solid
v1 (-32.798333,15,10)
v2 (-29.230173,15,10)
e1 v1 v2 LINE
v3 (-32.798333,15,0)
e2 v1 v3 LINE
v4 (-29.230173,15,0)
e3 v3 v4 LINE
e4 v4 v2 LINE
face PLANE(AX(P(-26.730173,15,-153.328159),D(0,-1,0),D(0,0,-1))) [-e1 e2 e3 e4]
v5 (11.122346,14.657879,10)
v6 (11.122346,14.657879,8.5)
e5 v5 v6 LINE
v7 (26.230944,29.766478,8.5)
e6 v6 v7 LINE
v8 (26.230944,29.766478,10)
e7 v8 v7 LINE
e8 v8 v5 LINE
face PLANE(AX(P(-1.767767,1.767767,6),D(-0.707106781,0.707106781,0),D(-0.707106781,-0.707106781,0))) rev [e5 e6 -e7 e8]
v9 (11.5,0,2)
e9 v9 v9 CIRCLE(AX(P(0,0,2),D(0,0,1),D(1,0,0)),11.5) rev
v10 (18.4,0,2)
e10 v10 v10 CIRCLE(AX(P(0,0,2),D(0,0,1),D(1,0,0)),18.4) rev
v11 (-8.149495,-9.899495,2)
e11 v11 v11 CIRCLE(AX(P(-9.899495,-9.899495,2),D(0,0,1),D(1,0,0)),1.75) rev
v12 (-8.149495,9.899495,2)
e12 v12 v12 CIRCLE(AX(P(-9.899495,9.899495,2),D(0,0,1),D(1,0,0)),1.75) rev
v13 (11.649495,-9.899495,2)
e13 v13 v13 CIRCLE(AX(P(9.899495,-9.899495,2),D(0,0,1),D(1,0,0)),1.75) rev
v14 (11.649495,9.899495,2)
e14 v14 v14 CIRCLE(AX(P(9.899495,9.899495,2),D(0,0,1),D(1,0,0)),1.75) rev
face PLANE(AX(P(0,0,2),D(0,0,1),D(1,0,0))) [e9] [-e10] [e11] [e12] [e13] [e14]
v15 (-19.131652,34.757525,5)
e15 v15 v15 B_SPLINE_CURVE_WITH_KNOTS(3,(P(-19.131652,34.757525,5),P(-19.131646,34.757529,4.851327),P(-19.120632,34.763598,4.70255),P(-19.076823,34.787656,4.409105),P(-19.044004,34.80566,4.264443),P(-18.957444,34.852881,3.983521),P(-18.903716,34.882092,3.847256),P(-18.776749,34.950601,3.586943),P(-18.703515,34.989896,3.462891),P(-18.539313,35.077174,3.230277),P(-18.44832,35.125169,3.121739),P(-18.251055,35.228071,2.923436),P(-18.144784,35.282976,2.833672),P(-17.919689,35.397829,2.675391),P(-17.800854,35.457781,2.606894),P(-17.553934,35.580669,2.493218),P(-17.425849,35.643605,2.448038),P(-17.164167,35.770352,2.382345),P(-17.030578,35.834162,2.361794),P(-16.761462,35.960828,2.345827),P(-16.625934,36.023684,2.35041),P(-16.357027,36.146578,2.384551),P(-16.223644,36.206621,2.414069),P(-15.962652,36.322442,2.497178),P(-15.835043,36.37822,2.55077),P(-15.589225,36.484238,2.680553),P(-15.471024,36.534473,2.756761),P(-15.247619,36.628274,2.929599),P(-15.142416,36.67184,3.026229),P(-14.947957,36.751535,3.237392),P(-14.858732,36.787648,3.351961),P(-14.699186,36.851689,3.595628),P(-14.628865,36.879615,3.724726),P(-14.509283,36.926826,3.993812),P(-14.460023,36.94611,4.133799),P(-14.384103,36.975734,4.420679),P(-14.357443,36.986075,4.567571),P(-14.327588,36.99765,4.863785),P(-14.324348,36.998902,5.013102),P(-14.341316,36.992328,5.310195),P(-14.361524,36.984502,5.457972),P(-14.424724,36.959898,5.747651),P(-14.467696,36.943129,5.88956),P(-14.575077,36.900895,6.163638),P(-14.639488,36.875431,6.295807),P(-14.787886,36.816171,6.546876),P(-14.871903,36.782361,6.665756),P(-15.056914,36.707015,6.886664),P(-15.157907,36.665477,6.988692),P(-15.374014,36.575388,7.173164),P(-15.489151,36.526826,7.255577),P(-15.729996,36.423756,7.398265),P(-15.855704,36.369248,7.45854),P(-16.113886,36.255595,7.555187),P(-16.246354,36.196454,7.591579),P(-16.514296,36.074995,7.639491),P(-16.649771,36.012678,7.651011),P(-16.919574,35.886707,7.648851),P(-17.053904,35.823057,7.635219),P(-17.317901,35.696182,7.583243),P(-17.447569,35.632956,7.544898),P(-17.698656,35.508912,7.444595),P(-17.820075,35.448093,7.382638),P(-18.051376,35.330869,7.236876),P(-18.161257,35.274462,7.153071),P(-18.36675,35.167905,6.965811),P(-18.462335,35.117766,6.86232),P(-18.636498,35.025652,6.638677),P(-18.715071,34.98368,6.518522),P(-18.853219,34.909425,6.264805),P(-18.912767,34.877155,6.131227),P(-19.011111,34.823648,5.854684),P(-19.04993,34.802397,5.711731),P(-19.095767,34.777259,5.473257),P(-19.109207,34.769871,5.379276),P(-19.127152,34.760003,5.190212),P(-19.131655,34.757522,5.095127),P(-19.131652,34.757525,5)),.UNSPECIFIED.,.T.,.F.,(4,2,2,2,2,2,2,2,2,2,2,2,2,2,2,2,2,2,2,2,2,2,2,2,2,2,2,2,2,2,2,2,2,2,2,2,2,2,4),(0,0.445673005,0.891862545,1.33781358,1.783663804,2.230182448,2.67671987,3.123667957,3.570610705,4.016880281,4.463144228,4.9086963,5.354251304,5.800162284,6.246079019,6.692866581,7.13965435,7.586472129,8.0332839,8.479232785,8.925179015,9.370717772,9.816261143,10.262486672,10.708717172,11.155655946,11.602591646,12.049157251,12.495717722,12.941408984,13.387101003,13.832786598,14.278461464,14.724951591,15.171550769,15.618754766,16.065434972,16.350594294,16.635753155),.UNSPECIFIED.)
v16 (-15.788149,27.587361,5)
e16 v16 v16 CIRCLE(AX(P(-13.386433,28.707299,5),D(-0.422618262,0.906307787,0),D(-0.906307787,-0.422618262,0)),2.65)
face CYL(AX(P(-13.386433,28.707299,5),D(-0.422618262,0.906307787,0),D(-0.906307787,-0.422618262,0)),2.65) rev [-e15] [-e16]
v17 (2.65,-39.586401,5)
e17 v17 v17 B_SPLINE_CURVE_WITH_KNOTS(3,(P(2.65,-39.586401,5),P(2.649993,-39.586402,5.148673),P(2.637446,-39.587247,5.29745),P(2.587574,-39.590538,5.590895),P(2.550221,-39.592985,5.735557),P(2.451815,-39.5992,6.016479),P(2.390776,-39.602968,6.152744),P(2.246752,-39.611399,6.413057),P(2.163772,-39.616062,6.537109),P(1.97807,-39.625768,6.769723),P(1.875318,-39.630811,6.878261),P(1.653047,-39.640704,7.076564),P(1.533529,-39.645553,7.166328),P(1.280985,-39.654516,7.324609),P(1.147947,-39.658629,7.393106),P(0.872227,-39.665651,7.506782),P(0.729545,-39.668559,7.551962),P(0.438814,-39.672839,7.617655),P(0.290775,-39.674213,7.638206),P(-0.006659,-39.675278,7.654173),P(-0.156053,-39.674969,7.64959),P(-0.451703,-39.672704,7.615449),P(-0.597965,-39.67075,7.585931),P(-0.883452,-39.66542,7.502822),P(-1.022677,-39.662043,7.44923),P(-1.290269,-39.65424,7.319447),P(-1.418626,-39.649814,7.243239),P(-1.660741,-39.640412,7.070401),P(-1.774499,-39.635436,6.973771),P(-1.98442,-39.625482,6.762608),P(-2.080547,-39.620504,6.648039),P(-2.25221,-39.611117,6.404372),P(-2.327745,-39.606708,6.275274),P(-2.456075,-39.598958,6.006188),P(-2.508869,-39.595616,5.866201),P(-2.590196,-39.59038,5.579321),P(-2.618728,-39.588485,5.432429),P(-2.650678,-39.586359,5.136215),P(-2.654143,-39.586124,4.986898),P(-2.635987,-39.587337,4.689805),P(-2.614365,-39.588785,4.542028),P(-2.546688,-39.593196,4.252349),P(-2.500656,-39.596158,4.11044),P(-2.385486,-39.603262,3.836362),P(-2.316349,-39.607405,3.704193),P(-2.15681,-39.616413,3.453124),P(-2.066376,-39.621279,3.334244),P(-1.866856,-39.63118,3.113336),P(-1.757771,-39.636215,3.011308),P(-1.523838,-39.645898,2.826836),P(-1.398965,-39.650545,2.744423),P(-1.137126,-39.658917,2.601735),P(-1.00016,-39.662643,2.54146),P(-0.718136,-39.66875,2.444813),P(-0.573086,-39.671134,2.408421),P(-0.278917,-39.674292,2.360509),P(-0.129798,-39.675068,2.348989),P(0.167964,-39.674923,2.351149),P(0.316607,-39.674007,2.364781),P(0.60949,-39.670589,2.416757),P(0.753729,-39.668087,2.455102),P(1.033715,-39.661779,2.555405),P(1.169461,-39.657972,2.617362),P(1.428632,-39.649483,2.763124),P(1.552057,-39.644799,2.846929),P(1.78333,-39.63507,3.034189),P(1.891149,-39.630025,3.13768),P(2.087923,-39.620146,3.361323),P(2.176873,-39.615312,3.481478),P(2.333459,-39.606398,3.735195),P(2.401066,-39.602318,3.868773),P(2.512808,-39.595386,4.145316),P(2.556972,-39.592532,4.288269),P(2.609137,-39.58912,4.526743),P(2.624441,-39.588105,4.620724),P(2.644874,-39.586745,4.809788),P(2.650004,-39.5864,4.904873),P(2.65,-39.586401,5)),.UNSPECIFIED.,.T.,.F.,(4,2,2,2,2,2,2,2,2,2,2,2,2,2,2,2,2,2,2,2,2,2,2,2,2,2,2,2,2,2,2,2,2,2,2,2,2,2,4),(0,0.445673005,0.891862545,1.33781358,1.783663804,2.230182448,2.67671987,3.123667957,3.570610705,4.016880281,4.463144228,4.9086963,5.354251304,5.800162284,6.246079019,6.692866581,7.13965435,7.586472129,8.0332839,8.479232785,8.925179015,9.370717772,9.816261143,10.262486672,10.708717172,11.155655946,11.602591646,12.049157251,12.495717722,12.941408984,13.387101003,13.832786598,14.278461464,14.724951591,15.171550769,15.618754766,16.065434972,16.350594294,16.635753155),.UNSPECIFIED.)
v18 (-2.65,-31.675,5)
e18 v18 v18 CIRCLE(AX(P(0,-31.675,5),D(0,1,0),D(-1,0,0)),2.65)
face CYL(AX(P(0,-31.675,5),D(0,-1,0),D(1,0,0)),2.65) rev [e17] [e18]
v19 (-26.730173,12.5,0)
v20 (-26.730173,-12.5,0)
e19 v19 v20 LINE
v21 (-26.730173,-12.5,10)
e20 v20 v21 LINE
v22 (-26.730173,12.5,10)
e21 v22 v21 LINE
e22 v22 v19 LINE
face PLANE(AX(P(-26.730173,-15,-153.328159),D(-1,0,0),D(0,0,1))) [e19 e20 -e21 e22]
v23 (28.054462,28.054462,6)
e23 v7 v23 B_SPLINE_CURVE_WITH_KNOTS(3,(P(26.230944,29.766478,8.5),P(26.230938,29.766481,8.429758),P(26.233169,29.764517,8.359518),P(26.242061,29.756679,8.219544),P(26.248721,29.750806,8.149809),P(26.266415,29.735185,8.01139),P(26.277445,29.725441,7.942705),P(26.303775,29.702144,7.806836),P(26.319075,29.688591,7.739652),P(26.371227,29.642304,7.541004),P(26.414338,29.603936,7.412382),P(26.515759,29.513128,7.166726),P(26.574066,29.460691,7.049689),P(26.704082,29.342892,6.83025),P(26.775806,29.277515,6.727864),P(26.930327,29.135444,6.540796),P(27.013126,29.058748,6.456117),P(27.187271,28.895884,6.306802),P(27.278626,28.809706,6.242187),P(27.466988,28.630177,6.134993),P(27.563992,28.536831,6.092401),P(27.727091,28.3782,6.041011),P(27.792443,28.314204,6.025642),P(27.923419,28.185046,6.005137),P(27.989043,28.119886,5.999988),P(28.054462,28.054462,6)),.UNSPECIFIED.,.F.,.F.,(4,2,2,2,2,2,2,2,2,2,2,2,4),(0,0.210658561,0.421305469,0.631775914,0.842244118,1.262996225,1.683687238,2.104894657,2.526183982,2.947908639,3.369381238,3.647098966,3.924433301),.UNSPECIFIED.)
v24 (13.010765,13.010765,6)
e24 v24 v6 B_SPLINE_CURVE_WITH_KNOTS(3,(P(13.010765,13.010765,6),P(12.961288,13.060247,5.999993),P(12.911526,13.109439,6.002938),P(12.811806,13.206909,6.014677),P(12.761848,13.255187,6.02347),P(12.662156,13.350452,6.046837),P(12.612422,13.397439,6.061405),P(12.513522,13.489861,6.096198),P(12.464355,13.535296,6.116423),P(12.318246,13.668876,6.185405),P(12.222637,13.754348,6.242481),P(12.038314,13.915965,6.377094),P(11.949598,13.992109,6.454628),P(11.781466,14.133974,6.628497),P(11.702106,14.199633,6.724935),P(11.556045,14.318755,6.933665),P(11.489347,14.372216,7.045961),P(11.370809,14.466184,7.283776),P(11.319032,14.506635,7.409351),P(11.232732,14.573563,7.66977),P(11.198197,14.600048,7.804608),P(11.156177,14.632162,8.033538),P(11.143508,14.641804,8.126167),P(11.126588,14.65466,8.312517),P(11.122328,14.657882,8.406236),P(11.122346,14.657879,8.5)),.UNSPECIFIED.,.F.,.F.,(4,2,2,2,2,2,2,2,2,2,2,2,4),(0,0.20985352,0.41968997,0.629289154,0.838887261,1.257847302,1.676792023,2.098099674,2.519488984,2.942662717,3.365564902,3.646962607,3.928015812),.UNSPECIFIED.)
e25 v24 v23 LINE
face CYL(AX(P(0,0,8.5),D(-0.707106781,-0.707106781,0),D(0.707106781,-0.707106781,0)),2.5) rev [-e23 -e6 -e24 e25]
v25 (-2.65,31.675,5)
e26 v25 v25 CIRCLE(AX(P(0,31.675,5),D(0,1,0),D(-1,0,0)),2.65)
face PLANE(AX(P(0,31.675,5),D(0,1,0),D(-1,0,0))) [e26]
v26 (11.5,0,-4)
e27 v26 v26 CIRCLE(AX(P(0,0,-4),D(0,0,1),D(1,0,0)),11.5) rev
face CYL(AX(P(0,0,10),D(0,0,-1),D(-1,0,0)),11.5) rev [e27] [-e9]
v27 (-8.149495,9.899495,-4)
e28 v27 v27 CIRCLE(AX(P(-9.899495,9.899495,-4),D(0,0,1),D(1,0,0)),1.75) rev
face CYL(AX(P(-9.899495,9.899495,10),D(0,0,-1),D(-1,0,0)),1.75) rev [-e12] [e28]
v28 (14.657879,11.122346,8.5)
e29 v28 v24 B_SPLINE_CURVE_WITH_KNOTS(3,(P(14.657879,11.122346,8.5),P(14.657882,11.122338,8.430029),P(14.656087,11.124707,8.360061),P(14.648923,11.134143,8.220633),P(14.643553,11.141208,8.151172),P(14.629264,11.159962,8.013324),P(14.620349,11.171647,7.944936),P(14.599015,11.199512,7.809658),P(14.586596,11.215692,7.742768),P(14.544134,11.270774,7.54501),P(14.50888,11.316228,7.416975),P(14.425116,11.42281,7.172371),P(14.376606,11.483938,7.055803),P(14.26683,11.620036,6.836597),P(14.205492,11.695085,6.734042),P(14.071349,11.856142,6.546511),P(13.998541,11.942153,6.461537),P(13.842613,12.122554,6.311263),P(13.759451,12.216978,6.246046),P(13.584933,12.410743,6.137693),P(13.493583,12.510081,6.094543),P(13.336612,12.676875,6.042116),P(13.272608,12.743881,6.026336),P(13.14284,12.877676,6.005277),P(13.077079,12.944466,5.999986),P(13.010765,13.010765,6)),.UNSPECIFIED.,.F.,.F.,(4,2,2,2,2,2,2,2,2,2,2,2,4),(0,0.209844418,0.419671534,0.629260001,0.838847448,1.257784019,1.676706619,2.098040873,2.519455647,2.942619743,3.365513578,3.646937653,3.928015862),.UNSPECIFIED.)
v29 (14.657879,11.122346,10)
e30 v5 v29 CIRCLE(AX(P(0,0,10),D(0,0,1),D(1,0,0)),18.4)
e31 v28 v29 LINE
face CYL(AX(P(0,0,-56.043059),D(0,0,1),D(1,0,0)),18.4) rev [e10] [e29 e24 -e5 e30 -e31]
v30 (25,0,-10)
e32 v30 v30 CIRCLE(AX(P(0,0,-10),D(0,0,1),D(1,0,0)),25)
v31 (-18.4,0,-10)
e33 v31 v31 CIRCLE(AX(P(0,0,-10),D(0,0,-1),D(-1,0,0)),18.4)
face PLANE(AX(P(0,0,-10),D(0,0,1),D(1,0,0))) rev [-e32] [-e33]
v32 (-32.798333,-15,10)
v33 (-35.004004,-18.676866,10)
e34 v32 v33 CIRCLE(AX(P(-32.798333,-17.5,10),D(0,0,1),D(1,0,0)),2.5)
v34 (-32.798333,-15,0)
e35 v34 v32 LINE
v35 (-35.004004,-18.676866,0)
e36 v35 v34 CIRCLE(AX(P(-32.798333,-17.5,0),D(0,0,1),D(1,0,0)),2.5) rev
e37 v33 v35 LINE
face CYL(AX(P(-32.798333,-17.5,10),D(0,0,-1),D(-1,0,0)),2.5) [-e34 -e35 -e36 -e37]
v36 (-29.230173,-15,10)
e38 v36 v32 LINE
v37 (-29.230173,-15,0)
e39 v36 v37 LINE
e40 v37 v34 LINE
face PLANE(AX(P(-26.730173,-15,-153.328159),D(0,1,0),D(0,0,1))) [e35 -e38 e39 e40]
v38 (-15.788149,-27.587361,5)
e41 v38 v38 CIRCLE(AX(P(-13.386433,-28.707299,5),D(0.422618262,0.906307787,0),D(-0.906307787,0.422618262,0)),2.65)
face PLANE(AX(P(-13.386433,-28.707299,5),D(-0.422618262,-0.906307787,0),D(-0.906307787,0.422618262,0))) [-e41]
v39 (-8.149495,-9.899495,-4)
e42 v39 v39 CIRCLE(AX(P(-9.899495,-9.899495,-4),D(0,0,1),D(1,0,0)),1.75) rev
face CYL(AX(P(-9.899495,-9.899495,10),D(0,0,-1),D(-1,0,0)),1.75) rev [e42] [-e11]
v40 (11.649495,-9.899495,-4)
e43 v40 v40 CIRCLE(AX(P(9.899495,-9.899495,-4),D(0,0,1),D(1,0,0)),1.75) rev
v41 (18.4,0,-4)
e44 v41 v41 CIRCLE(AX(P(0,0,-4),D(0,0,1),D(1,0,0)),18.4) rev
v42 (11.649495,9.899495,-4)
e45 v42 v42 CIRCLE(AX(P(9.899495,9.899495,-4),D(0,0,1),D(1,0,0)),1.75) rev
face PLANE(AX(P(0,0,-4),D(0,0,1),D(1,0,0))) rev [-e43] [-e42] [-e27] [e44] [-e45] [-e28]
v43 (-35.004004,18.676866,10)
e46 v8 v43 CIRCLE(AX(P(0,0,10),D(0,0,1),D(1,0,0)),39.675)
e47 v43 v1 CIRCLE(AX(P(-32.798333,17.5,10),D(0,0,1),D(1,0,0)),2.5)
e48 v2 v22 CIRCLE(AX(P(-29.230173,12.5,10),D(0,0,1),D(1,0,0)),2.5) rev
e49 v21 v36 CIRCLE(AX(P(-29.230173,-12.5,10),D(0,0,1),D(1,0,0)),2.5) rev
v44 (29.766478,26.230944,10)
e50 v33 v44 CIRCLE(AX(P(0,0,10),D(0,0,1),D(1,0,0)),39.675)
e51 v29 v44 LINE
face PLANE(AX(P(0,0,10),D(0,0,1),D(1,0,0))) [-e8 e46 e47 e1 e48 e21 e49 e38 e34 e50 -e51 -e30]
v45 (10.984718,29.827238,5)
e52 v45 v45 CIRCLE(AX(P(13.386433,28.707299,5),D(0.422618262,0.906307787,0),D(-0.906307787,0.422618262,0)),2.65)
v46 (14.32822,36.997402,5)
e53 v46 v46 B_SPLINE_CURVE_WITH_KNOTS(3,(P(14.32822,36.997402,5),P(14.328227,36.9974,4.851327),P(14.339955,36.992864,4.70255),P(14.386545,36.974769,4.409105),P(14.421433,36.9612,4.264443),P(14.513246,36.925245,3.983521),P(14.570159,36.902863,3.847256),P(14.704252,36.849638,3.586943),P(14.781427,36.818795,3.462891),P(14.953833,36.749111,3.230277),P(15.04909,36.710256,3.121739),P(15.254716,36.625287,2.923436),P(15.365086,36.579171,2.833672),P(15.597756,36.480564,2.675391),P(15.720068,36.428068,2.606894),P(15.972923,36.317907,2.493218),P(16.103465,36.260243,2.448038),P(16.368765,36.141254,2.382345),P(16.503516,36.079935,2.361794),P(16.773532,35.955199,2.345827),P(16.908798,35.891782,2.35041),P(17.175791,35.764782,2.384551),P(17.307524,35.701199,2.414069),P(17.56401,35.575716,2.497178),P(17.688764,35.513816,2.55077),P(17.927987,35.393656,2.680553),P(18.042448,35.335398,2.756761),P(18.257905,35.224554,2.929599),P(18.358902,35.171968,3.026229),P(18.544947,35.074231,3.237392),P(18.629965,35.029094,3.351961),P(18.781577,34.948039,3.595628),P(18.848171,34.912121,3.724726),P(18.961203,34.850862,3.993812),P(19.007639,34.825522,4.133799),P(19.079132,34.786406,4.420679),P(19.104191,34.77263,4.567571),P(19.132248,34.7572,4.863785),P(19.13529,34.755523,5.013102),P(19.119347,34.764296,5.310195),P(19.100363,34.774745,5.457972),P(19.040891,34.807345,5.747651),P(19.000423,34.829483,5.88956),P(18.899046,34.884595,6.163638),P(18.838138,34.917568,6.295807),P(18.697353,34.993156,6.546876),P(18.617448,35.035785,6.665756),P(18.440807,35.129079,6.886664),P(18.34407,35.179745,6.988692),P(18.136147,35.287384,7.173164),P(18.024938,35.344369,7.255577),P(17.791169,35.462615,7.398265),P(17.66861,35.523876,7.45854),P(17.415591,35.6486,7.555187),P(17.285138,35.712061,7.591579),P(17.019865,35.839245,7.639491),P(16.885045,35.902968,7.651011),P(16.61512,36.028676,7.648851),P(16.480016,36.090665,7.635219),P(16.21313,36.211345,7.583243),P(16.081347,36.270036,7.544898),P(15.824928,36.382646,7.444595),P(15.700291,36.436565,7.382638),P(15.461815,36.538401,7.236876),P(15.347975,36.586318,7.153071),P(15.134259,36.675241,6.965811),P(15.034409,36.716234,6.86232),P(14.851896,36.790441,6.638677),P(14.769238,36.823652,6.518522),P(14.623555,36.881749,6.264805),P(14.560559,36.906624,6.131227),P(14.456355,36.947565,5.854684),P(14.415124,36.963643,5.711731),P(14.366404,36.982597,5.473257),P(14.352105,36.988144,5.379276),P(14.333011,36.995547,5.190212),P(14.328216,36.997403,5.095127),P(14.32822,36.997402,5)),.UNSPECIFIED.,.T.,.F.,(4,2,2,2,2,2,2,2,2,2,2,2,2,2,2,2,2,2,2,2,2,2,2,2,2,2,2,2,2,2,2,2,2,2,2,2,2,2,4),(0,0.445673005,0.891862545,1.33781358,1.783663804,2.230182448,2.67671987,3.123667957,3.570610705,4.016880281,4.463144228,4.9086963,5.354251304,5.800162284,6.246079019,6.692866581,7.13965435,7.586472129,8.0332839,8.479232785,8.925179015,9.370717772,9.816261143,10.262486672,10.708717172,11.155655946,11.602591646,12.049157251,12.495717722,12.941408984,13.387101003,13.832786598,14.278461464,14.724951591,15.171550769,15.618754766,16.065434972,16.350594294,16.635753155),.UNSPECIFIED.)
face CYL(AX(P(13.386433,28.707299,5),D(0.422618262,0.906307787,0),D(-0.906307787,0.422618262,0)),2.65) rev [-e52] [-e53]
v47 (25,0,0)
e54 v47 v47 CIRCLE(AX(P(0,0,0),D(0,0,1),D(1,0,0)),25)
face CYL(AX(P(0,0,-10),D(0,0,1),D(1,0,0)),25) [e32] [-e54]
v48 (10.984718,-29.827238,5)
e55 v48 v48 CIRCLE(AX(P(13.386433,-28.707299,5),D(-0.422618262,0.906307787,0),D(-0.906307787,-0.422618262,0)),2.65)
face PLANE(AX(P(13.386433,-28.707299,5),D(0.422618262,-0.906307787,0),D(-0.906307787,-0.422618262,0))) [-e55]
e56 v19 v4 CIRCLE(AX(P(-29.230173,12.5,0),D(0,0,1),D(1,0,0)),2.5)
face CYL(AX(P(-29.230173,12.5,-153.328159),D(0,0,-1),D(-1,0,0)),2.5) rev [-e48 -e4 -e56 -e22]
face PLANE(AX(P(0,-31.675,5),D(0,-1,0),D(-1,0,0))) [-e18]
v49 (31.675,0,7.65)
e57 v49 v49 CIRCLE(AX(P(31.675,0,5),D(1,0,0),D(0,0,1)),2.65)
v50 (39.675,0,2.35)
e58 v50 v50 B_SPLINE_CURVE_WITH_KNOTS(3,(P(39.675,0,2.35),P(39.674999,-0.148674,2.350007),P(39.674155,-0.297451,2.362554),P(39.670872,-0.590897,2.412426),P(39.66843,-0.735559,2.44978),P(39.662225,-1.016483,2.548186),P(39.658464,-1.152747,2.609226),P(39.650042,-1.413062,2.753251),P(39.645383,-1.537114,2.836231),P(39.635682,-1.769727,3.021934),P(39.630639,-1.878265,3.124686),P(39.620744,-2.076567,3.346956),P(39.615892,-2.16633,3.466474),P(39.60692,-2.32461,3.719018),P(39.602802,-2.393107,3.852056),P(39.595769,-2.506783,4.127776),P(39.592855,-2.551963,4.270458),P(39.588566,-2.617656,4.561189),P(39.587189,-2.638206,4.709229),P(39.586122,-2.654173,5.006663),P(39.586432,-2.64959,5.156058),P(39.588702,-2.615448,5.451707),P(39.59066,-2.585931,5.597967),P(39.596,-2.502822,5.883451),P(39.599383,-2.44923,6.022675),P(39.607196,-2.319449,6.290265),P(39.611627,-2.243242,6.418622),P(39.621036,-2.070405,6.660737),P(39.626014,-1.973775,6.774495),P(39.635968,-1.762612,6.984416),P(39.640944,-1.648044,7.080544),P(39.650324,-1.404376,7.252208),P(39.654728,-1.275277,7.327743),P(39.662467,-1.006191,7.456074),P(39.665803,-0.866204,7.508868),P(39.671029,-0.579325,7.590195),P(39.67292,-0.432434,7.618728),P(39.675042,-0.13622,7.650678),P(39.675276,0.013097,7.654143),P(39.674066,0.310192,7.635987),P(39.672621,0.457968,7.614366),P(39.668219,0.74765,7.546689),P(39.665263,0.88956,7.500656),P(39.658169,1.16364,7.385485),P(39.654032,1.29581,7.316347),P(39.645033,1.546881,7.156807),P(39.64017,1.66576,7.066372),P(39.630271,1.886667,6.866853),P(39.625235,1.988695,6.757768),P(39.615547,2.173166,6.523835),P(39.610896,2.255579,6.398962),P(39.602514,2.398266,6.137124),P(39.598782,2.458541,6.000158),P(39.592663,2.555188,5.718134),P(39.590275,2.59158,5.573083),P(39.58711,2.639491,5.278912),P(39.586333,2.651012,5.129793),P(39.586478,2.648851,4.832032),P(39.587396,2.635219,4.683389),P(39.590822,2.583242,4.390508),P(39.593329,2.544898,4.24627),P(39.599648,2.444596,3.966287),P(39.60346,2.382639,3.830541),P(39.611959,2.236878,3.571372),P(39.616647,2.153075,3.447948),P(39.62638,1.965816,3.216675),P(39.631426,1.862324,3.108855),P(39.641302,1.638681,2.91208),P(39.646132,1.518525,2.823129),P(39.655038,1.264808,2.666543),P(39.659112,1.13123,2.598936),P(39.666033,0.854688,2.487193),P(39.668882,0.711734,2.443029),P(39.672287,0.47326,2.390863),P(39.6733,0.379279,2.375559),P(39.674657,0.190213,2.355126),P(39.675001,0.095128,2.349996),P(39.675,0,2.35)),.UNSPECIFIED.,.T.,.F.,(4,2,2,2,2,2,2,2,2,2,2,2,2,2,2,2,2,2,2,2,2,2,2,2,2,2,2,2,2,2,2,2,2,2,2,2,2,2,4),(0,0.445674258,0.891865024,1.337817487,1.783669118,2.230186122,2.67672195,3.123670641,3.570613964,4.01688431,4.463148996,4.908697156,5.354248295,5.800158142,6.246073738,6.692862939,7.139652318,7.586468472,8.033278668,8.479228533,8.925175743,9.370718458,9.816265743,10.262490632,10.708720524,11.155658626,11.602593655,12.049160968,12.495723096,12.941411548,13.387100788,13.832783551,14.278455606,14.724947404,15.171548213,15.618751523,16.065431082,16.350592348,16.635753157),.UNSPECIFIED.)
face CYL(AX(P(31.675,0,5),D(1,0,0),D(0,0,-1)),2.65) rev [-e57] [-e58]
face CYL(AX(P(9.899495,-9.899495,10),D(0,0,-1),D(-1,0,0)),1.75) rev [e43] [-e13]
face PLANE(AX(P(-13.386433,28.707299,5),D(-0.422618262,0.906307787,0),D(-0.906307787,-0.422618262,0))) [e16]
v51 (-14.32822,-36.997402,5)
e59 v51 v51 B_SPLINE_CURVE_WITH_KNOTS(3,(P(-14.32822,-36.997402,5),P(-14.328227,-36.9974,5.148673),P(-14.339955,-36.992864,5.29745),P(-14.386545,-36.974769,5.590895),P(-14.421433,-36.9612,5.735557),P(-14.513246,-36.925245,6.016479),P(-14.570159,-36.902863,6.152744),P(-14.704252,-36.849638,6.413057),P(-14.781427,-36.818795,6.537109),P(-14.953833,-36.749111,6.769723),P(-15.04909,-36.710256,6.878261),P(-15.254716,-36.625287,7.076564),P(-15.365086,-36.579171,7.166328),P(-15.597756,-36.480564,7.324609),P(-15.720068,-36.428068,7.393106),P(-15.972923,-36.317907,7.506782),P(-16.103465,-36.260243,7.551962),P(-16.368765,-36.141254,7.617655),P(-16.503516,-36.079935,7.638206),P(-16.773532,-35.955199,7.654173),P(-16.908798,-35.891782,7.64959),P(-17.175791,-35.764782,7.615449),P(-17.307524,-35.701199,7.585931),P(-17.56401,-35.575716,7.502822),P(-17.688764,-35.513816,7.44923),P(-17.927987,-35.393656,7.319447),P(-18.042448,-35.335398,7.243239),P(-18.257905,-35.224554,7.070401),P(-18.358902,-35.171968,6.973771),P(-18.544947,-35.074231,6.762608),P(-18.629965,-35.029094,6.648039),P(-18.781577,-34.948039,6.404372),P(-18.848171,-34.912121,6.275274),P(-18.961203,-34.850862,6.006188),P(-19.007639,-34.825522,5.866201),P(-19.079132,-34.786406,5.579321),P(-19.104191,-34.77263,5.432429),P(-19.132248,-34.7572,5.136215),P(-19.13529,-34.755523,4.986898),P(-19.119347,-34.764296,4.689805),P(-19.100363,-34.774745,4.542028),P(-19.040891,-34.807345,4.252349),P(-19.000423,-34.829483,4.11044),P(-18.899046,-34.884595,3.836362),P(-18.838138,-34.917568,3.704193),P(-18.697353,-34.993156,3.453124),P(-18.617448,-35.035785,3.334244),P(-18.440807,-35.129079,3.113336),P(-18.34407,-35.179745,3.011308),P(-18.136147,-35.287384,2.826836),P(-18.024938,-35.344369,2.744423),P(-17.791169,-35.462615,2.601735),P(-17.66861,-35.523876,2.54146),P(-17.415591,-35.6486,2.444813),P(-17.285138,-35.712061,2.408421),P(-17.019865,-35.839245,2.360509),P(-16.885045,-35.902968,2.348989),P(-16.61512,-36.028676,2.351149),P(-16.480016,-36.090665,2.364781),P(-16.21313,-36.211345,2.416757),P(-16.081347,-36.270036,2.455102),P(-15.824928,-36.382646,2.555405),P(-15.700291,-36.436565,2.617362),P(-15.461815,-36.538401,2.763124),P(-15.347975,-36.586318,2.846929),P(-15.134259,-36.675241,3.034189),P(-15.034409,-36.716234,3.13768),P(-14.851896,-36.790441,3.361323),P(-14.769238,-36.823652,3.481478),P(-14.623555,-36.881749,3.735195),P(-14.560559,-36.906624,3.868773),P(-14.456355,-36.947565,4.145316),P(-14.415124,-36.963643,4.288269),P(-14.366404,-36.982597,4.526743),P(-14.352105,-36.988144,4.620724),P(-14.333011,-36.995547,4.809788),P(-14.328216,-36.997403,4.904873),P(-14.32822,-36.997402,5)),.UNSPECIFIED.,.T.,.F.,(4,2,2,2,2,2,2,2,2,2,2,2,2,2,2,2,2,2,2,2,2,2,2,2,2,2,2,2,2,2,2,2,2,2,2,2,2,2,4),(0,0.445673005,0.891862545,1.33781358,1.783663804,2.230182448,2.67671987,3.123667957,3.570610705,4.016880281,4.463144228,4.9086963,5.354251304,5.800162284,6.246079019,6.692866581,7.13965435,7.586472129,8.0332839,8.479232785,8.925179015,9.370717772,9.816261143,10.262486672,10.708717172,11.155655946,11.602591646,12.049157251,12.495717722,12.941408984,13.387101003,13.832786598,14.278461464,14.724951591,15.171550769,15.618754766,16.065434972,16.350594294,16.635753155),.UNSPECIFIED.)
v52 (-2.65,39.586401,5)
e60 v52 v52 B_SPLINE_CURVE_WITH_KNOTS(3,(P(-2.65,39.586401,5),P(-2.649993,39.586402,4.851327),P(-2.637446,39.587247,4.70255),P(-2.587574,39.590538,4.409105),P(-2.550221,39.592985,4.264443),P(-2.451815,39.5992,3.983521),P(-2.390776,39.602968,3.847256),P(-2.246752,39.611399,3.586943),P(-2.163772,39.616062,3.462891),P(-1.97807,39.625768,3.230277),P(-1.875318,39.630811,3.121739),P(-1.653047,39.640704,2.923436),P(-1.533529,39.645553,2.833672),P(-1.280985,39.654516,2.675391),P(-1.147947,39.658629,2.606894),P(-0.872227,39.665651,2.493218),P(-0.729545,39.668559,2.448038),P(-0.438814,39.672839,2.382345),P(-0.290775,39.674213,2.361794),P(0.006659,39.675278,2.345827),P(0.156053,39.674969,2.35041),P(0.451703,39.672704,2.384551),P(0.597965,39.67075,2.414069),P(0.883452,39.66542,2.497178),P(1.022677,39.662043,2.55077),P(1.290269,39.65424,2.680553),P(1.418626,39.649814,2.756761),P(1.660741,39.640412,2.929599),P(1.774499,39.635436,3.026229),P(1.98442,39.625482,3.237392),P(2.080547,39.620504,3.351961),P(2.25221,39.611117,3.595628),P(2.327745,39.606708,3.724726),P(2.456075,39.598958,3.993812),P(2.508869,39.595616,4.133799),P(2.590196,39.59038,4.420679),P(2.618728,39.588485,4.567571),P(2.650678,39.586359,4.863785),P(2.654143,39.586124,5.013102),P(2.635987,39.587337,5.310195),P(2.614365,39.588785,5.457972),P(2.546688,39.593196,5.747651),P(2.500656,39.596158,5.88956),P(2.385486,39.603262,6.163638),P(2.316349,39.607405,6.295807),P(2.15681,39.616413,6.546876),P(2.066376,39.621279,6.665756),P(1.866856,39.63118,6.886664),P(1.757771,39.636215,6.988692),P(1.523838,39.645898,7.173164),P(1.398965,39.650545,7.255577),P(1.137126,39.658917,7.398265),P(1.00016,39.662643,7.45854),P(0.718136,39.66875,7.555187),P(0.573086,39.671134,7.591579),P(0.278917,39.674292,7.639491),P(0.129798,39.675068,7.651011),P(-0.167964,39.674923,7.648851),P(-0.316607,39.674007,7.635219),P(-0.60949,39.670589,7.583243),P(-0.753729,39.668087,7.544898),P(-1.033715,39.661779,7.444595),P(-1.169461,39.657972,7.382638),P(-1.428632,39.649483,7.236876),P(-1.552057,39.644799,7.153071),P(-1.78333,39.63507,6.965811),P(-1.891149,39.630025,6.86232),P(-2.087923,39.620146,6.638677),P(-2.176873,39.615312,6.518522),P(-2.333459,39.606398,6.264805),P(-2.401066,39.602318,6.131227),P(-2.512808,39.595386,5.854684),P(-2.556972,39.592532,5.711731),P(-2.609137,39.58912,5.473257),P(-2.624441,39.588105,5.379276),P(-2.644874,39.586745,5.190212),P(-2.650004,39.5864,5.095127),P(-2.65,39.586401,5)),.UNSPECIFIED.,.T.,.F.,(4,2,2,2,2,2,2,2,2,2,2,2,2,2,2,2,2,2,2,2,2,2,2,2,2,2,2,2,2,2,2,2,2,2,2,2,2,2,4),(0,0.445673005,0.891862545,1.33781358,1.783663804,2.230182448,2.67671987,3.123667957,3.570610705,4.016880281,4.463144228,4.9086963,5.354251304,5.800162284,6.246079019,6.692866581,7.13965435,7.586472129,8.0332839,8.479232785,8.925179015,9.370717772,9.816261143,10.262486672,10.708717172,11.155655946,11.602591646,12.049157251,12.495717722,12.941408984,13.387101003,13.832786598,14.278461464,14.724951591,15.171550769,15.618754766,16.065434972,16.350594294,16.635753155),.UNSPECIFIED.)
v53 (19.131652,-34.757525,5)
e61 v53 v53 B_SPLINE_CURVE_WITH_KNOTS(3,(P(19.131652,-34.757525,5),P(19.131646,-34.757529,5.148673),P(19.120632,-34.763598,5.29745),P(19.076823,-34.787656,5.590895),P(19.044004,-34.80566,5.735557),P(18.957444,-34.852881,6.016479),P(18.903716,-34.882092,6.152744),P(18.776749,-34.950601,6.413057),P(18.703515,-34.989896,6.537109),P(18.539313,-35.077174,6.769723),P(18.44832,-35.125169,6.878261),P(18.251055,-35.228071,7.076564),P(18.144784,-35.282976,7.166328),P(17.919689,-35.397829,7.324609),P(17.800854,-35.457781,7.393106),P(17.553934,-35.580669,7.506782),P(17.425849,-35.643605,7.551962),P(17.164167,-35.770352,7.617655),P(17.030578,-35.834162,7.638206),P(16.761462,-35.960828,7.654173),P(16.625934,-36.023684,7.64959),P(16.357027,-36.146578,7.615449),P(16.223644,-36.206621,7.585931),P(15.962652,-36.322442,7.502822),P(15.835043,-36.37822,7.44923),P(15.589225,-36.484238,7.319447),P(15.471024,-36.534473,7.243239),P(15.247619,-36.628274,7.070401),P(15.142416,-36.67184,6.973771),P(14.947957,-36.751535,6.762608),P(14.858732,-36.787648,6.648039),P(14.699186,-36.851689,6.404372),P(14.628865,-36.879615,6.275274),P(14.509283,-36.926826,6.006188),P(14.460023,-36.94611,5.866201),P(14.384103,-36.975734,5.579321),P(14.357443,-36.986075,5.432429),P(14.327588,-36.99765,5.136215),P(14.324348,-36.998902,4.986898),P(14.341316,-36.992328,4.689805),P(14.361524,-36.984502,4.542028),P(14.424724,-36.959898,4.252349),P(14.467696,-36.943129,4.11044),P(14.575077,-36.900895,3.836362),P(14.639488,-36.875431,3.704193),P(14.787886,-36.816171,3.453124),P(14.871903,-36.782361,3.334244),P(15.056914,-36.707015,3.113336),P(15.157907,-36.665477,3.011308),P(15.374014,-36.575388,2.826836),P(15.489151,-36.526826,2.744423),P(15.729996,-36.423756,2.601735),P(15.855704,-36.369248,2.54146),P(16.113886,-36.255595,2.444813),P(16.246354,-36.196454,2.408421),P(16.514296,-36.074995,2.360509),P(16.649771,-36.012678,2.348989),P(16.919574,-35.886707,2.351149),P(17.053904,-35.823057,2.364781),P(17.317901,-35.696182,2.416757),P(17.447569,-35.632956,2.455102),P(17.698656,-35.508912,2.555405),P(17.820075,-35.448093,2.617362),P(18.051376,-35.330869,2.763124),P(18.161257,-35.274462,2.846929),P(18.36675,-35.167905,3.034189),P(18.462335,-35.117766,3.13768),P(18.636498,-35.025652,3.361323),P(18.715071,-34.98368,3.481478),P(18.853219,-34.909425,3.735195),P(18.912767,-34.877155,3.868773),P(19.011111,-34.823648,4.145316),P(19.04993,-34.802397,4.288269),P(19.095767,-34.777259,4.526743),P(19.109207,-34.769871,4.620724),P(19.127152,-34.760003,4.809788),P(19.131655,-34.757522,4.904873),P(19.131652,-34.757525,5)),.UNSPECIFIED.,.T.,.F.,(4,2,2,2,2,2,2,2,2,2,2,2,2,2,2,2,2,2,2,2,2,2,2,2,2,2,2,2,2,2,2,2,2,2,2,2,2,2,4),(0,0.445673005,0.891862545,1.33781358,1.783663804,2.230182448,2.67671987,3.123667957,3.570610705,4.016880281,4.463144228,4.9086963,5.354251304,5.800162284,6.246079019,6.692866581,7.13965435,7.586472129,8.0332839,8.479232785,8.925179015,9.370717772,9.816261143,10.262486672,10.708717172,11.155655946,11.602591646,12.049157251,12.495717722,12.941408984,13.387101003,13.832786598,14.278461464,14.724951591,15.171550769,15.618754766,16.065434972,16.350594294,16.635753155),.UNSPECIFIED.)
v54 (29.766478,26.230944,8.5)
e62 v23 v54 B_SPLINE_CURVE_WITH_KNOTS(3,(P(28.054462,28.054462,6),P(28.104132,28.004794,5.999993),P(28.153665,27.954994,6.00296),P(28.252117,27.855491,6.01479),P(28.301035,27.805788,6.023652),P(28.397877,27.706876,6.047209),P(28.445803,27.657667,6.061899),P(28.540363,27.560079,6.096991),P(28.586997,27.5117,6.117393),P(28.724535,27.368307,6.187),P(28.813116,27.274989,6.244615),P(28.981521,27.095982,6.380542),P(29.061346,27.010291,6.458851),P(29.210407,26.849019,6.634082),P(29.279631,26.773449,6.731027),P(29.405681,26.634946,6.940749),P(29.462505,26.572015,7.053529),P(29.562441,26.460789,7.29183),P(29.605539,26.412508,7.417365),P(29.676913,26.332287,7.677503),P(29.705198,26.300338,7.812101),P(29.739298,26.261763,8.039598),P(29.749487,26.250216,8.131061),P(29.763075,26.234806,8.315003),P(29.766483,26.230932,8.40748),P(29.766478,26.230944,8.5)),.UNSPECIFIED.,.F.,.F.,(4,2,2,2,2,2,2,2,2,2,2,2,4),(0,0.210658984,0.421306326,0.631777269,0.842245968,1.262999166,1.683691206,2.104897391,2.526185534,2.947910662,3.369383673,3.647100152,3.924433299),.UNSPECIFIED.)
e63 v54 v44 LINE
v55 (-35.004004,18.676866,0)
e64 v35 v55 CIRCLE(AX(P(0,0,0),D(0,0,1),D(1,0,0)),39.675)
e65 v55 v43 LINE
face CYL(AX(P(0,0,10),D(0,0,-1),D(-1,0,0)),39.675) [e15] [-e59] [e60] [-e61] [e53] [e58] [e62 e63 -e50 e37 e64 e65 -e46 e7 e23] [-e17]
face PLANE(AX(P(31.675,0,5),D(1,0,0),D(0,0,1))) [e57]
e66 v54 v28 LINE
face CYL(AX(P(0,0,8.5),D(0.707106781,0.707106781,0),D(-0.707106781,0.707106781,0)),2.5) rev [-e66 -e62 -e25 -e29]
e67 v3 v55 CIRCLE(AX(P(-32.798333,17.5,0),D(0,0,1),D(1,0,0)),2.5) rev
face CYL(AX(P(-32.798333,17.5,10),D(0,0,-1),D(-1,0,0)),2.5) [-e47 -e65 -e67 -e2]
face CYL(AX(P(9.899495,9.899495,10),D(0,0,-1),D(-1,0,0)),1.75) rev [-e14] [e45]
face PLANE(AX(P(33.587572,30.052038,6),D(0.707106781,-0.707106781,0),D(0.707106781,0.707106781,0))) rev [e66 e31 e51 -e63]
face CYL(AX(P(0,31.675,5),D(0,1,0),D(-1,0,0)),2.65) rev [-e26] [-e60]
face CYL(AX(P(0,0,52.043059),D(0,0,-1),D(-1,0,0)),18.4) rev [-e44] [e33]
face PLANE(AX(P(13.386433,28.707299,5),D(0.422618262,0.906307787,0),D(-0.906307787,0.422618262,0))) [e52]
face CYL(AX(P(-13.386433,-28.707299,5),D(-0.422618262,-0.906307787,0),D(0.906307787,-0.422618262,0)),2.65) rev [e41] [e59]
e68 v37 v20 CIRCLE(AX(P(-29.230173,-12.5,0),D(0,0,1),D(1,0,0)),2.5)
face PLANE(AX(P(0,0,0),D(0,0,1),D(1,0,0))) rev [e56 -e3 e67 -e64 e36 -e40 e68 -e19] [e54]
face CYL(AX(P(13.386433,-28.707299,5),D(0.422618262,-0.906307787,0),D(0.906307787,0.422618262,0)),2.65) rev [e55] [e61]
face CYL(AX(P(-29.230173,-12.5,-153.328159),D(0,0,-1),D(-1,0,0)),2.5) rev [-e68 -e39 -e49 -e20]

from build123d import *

# Parameters (mm, degrees)
SKETCH_1_R                = 39.675
EXTRUDE_1_DEPTH           = 10
SKETCH_7_R                = 2.65
CUT_EXTRUDE_5_DEPTH       = 8
PATTERN_CIRCULAR_1_COUNT  = 2
PATTERN_CIRCULAR_1_ANGLE  = 25
F_1_THE_OTHER_WAY_COUNT   = 2
F_1_THE_OTHER_WAY_ANGLE   = 25
MIRROR_1_COPY_1_SKETCH_R  = 2.65
MIRROR_1_COPY_1_DEPTH     = 8
MIRROR_1_COPY_2_SKETCH_R  = 2.65
MIRROR_1_COPY_2_DEPTH     = 8
SKETCH_9_R                = 2.65
CUT_EXTRUDE_7_DEPTH       = 8
PATTERN_CIRCULAR_2_COUNT  = 2
CUT_EXTRUDE_START         = -10
CUT_EXTRUDE_8_DEPTH       = 10
CUT_EXTRUDE_13_DEPTH      = 4
SKETCH_12_R               = 25
EXTRUDE_2_DEPTH           = 10
CUT_EXTRUDE_16_DEPTH      = 57.993080877
CUT_EXTRUDE_16_DEPTH_BACK = 57.993080877
SKETCH_18_R               = 11.5
SKETCH_18_R_2             = 1.75
SKETCH_19_R               = 18.4
CUT_EXTRUDE_17_DEPTH      = 6
CUT_EXTRUDE_START_2       = -8
SKETCH_20_R               = 18.4
CUT_EXTRUDE_18_DEPTH      = 8
FILLET_2_R                = 2.5


# Read off the part's stored shape, not the designer's step: Вырез-Вытянуть8
with BuildPart() as part:
    # Эскиз1 → Бобышка-Вытянуть1 (new body)
    with BuildSketch(Plane.XY):
        Circle(SKETCH_1_R)
    extrude(amount=EXTRUDE_1_DEPTH)

    # Эскиз7 → Вырез-Вытянуть5 (cut)
    with BuildSketch(Plane(origin=(0, 39.675, 0), x_dir=(0, 0, -1), z_dir=(0, 1, 0))):
        with Locations(Location((-5, 0, 0), (0, 0, 90))):
            Circle(SKETCH_7_R)
    cut_extrude_5 = extrude(amount=-CUT_EXTRUDE_5_DEPTH, mode=Mode.SUBTRACT)

    # Круговой массив1: Вырез-Вытянуть5 ×2 about axis
    pattern_circular_1_axis = Axis((0, 0, 10), (0, 0, -1))
    for i in range(1, PATTERN_CIRCULAR_1_COUNT):
        add(cut_extrude_5.rotate(pattern_circular_1_axis, i * PATTERN_CIRCULAR_1_ANGLE / (PATTERN_CIRCULAR_1_COUNT - 1)), mode=Mode.SUBTRACT)

    # 1 the other way: Вырез-Вытянуть5 ×2 about axis
    f_1_the_other_way_axis = Axis((0, 0, 10), (0, 0, 1))
    for i in range(1, F_1_THE_OTHER_WAY_COUNT):
        add(cut_extrude_5.rotate(f_1_the_other_way_axis, i * F_1_THE_OTHER_WAY_ANGLE / (F_1_THE_OTHER_WAY_COUNT - 1)), mode=Mode.SUBTRACT)

    # Зеркальное отражение1: Вырез-Вытянуть5 across plane
    add(cut_extrude_5.mirror(Plane.ZX), mode=Mode.SUBTRACT)

    # Зеркальное отражение1 copy 1 sketch → Зеркальное отражение1 copy 1 (cut)
    with BuildSketch(Plane(origin=(16.767379535, -35.957761451, 0), x_dir=(0, 0, -1), z_dir=(0.4226182617407035, -0.906307787036648, 0))):
        with Locations((-5, 0)):
            Circle(MIRROR_1_COPY_1_SKETCH_R)
    extrude(amount=-MIRROR_1_COPY_1_DEPTH, mode=Mode.SUBTRACT)

    # Зеркальное отражение1 copy 2 sketch → Зеркальное отражение1 copy 2 (cut)
    with BuildSketch(Plane(origin=(-16.767379535, -35.957761451, 0), x_dir=(0, 0, -1), z_dir=(-0.42261826174069717, -0.9063077870366509, 0))):
        with Locations((-5, 0)):
            Circle(MIRROR_1_COPY_2_SKETCH_R)
    extrude(amount=-MIRROR_1_COPY_2_DEPTH, mode=Mode.SUBTRACT)

    # Эскиз9 → Вырез-Вытянуть7 (cut)
    with BuildSketch(Plane.ZY.offset(39.675)):
        with Locations((5, 0)):
            Circle(SKETCH_9_R)
    cut_extrude_7 = extrude(amount=-CUT_EXTRUDE_7_DEPTH, mode=Mode.SUBTRACT)

    # Круговой массив2: Вырез-Вытянуть7 ×2 about axis
    pattern_circular_2_axis = Axis((0, 0, 10), (0, 0, -1))
    for i in range(1, PATTERN_CIRCULAR_2_COUNT):
        add(cut_extrude_7.rotate(pattern_circular_2_axis, i * 360 / PATTERN_CIRCULAR_2_COUNT), mode=Mode.SUBTRACT)

    # Вырез-Вытянуть8 outline → Вырез-Вытянуть8 (cut)
    with BuildSketch(Plane(origin=(0, 0, 0), x_dir=(-1, 0, 0), z_dir=(0, 0, -1)).offset(CUT_EXTRUDE_START)):
        with BuildLine():
            Line((36.730173223, 15), (26.730173223, 15))
            Line((26.730173223, 15), (26.730173223, -15))
            Line((26.730173223, -15), (36.730173223, -15))
            ThreePointArc((36.730173223, -15), (39.675, 0), (36.730173223, 15))
        make_face()
    extrude(amount=CUT_EXTRUDE_8_DEPTH, mode=Mode.SUBTRACT)

    # Эскиз15 → Вырез-Вытянуть13 (cut)
    with BuildSketch(Plane.XY.offset(10)):
        Polygon((-1.767766953, 1.767766953), (1.767766953, -1.767766953), (33.587572106, 30.0520382), (30.0520382, 33.587572106), align=None)
    extrude(amount=-CUT_EXTRUDE_13_DEPTH, mode=Mode.SUBTRACT)

    # Эскиз12 → Бобышка-Вытянуть2 (add)
    with BuildSketch(Plane.XY):
        Circle(SKETCH_12_R)
    extrude(amount=-EXTRUDE_2_DEPTH)

    # Эскиз18 → Вырез-Вытянуть16 (cut, two sides: drawn at the far end of the back side and taken through both)
    with BuildSketch(Plane(origin=(0, 0, 0), x_dir=(-1, 0, 0), z_dir=(0, 0, -1)).offset(-CUT_EXTRUDE_16_DEPTH_BACK)):
        Circle(SKETCH_18_R)
        with Locations((9.899494937, 9.899494937)):
            Circle(SKETCH_18_R_2)
        with Locations((9.899494937, -9.899494937)):
            Circle(SKETCH_18_R_2)
        with Locations((-9.899494937, -9.899494937)):
            Circle(SKETCH_18_R_2)
        with Locations((-9.899494937, 9.899494937)):
            Circle(SKETCH_18_R_2)
    extrude(amount=CUT_EXTRUDE_16_DEPTH + CUT_EXTRUDE_16_DEPTH_BACK, mode=Mode.SUBTRACT)

    # Эскиз19 → Вырез-Вытянуть17 (cut)
    with BuildSketch(Plane(origin=(0, 0, -10), x_dir=(-1, 0, 0), z_dir=(0, 0, -1))):
        Circle(SKETCH_19_R)
    extrude(amount=-CUT_EXTRUDE_17_DEPTH, mode=Mode.SUBTRACT)

    # Эскиз20 → Вырез-Вытянуть18 (cut)
    with BuildSketch(Plane.XY.offset(10).offset(CUT_EXTRUDE_START_2)):
        with Locations(Location((0, 0, 0), (0, 0, 180))):
            Circle(SKETCH_20_R)
    extrude(amount=CUT_EXTRUDE_18_DEPTH, mode=Mode.SUBTRACT)

    # Скругление2
    fillet_2_edges = [part.edges().sort_by_distance(p)[0] for p in [
        (18.676644746, 22.212178652, 6),
        (22.212178652, 18.676644746, 6),
        (-26.730173223, 15, 5),
        (-26.730173223, -15, 5),
    ]]
    fillet(fillet_2_edges, radius=FILLET_2_R - 0.0004)  # a hair under: the kernel refuses the full size
    fillet_2_2_edges = [part.edges().sort_by_distance(p)[0] for p in [
        (-36.730173223, -15, 5),
        (-36.730173223, 15, 5),
    ]]
    fillet(fillet_2_2_edges, radius=FILLET_2_R)


solid = part.part
